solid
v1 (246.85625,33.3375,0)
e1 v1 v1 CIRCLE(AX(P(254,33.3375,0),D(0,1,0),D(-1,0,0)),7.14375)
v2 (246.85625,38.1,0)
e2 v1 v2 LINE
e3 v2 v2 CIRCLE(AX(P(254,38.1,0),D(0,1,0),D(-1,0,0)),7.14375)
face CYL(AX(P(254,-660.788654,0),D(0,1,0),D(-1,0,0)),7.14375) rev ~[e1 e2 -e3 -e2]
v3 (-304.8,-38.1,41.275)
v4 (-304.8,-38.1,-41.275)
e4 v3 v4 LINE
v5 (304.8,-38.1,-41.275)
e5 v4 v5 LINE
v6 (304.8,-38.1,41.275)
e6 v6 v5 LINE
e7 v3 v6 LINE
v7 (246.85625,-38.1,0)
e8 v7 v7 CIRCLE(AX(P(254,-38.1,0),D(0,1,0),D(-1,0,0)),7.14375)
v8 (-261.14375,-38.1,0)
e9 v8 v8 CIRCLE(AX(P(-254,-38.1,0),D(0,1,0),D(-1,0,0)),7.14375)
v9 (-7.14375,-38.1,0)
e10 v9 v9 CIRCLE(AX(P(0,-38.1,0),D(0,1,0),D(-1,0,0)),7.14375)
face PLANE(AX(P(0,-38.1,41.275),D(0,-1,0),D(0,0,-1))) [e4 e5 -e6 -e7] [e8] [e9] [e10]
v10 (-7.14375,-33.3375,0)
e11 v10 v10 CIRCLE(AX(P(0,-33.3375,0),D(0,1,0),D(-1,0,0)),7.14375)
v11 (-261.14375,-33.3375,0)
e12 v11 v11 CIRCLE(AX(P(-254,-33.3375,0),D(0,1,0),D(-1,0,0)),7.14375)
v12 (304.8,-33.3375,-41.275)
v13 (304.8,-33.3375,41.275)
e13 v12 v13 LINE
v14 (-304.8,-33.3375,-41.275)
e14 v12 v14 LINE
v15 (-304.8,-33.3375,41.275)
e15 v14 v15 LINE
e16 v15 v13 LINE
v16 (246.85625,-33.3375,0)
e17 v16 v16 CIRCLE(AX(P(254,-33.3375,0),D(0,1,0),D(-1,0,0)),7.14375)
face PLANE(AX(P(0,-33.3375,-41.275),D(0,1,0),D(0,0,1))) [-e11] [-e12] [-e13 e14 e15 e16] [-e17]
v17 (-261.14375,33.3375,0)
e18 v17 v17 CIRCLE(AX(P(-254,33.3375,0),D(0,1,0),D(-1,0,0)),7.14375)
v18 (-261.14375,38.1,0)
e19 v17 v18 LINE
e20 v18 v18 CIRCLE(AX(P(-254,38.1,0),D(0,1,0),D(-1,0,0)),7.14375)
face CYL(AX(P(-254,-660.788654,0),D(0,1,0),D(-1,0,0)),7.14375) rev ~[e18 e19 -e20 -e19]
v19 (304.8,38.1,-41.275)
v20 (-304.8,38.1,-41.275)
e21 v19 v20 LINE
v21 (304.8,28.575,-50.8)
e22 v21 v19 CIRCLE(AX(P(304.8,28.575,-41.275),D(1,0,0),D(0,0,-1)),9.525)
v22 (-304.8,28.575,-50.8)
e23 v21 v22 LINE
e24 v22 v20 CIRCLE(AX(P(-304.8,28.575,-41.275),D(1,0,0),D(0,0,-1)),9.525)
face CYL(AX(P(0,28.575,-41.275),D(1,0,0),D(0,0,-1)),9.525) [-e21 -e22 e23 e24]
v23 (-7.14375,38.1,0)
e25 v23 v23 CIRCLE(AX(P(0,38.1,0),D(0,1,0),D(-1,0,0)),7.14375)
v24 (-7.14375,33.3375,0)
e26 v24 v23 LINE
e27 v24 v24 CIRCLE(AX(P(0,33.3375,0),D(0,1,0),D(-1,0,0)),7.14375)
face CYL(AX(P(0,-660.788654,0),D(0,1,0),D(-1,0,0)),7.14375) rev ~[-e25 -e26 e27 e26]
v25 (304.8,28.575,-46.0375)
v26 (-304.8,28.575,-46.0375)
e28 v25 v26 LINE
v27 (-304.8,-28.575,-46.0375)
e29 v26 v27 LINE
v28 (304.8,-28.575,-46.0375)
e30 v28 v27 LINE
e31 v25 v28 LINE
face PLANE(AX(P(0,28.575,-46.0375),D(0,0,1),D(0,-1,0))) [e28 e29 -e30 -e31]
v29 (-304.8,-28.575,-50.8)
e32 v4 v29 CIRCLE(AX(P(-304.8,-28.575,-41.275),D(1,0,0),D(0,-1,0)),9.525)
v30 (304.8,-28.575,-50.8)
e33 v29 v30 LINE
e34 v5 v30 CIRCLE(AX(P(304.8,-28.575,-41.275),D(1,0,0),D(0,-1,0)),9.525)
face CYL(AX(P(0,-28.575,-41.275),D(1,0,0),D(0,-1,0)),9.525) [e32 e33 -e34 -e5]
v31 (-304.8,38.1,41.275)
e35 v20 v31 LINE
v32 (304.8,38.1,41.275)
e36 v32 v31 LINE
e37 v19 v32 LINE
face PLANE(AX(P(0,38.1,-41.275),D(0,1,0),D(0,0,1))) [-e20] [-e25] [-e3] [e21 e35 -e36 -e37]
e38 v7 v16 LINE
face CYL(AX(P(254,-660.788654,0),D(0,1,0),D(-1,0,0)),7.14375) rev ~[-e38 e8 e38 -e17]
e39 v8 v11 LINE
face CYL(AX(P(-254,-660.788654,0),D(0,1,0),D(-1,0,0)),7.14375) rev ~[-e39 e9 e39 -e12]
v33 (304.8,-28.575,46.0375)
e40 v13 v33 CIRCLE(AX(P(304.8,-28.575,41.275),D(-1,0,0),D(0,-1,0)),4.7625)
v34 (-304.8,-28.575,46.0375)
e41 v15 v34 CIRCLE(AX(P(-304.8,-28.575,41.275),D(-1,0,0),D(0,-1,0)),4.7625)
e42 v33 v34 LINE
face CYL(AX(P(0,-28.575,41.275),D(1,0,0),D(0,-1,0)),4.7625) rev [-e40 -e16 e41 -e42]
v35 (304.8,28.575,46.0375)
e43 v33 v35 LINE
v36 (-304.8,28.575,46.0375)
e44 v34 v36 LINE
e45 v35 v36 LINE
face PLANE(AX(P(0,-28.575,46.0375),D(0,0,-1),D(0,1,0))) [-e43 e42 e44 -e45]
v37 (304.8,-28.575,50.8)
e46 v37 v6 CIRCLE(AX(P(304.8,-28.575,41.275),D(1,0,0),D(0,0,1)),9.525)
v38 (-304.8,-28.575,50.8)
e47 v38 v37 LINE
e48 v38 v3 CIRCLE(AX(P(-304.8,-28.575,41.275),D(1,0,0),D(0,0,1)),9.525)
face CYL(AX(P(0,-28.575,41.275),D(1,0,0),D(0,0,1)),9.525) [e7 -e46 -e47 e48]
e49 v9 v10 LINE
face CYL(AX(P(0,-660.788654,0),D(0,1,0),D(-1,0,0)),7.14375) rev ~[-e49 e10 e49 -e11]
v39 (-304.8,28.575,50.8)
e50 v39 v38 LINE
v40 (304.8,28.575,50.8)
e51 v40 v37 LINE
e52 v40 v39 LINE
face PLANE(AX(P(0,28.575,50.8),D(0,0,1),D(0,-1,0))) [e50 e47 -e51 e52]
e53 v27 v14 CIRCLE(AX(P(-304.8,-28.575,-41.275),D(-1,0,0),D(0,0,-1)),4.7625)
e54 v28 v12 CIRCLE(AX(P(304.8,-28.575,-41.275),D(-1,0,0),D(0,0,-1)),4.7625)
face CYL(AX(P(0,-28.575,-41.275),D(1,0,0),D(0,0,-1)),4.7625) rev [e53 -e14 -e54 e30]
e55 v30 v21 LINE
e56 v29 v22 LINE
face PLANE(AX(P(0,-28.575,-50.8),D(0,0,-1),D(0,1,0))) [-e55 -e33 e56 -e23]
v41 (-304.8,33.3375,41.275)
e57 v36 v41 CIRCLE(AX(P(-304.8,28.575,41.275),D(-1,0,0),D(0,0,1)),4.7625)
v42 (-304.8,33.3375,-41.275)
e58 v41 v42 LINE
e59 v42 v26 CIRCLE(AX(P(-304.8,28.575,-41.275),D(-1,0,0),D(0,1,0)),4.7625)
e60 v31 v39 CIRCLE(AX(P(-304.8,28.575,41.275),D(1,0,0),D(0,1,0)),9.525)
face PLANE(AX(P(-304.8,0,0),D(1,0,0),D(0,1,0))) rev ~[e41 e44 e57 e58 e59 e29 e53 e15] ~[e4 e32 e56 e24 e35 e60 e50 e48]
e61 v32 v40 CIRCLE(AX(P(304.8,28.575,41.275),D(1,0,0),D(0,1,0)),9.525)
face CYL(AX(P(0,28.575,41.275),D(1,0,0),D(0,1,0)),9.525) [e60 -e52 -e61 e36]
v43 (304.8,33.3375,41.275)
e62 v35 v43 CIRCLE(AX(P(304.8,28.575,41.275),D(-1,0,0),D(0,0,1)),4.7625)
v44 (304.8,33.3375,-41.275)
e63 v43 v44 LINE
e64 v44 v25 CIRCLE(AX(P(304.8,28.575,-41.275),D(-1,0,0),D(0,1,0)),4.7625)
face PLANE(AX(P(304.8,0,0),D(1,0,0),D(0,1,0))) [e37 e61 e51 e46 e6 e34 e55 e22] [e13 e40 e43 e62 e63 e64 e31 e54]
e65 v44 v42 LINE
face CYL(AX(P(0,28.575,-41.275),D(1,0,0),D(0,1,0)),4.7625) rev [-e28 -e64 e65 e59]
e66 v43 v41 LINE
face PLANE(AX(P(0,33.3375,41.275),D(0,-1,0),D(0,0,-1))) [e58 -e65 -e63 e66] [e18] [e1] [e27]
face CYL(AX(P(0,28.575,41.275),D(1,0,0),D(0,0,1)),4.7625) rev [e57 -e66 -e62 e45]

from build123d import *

# Parameters (mm, degrees)
F2_DEPTH = 304.8
F4_D     = 14.2875


# Not quite as in the source:
# - a variable given as a bare number and used for a length is read in inches; the dataset says mm whatever the document's units were


with BuildPart() as f2:
    # F1 (on Right) → F2 (new body, symmetric)
    with BuildSketch(Plane.YZ):
        with BuildLine():
            Line((28.575, 50.8), (-28.575, 50.8))
            ThreePointArc((-28.575, 50.8), (-35.3101920908, 48.0101920908), (-38.1, 41.275))
            Line((-38.1, 41.275), (-38.1, -41.275))
            ThreePointArc((-38.1, -41.275), (-35.3101920908, -48.0101920908), (-28.575, -50.8))
            Line((-28.575, -50.8), (28.575, -50.8))
            ThreePointArc((28.575, -50.8), (35.3101920908, -48.0101920908), (38.1, -41.275))
            Line((38.1, -41.275), (38.1, 41.275))
            ThreePointArc((38.1, 41.275), (35.3101920908, 48.0101920908), (28.575, 50.8))
        make_face()
        with BuildLine():
            ThreePointArc((-33.3375, 41.275), (-31.9425960454, 44.6425960454), (-28.575, 46.0375))
            Line((-28.575, 46.0375), (28.575, 46.0375))
            ThreePointArc((28.575, 46.0375), (31.9425960454, 44.6425960454), (33.3375, 41.275))
            Line((33.3375, 41.275), (33.3375, -41.275))
            ThreePointArc((33.3375, -41.275), (31.9425960454, -44.6425960454), (28.575, -46.0375))
            Line((28.575, -46.0375), (-28.575, -46.0375))
            ThreePointArc((-28.575, -46.0375), (-31.9425960454, -44.6425960454), (-33.3375, -41.275))
            Line((-33.3375, -41.275), (-33.3375, 41.275))
        make_face(mode=Mode.SUBTRACT)
    extrude(amount=F2_DEPTH, both=True)

    # F4 (through all)
    with Locations(Plane.XZ.offset(38.1)):
        with Locations((-254, 0), (0, 0), (254, 0)):
            Hole(F4_D / 2)


solid = f2.part
